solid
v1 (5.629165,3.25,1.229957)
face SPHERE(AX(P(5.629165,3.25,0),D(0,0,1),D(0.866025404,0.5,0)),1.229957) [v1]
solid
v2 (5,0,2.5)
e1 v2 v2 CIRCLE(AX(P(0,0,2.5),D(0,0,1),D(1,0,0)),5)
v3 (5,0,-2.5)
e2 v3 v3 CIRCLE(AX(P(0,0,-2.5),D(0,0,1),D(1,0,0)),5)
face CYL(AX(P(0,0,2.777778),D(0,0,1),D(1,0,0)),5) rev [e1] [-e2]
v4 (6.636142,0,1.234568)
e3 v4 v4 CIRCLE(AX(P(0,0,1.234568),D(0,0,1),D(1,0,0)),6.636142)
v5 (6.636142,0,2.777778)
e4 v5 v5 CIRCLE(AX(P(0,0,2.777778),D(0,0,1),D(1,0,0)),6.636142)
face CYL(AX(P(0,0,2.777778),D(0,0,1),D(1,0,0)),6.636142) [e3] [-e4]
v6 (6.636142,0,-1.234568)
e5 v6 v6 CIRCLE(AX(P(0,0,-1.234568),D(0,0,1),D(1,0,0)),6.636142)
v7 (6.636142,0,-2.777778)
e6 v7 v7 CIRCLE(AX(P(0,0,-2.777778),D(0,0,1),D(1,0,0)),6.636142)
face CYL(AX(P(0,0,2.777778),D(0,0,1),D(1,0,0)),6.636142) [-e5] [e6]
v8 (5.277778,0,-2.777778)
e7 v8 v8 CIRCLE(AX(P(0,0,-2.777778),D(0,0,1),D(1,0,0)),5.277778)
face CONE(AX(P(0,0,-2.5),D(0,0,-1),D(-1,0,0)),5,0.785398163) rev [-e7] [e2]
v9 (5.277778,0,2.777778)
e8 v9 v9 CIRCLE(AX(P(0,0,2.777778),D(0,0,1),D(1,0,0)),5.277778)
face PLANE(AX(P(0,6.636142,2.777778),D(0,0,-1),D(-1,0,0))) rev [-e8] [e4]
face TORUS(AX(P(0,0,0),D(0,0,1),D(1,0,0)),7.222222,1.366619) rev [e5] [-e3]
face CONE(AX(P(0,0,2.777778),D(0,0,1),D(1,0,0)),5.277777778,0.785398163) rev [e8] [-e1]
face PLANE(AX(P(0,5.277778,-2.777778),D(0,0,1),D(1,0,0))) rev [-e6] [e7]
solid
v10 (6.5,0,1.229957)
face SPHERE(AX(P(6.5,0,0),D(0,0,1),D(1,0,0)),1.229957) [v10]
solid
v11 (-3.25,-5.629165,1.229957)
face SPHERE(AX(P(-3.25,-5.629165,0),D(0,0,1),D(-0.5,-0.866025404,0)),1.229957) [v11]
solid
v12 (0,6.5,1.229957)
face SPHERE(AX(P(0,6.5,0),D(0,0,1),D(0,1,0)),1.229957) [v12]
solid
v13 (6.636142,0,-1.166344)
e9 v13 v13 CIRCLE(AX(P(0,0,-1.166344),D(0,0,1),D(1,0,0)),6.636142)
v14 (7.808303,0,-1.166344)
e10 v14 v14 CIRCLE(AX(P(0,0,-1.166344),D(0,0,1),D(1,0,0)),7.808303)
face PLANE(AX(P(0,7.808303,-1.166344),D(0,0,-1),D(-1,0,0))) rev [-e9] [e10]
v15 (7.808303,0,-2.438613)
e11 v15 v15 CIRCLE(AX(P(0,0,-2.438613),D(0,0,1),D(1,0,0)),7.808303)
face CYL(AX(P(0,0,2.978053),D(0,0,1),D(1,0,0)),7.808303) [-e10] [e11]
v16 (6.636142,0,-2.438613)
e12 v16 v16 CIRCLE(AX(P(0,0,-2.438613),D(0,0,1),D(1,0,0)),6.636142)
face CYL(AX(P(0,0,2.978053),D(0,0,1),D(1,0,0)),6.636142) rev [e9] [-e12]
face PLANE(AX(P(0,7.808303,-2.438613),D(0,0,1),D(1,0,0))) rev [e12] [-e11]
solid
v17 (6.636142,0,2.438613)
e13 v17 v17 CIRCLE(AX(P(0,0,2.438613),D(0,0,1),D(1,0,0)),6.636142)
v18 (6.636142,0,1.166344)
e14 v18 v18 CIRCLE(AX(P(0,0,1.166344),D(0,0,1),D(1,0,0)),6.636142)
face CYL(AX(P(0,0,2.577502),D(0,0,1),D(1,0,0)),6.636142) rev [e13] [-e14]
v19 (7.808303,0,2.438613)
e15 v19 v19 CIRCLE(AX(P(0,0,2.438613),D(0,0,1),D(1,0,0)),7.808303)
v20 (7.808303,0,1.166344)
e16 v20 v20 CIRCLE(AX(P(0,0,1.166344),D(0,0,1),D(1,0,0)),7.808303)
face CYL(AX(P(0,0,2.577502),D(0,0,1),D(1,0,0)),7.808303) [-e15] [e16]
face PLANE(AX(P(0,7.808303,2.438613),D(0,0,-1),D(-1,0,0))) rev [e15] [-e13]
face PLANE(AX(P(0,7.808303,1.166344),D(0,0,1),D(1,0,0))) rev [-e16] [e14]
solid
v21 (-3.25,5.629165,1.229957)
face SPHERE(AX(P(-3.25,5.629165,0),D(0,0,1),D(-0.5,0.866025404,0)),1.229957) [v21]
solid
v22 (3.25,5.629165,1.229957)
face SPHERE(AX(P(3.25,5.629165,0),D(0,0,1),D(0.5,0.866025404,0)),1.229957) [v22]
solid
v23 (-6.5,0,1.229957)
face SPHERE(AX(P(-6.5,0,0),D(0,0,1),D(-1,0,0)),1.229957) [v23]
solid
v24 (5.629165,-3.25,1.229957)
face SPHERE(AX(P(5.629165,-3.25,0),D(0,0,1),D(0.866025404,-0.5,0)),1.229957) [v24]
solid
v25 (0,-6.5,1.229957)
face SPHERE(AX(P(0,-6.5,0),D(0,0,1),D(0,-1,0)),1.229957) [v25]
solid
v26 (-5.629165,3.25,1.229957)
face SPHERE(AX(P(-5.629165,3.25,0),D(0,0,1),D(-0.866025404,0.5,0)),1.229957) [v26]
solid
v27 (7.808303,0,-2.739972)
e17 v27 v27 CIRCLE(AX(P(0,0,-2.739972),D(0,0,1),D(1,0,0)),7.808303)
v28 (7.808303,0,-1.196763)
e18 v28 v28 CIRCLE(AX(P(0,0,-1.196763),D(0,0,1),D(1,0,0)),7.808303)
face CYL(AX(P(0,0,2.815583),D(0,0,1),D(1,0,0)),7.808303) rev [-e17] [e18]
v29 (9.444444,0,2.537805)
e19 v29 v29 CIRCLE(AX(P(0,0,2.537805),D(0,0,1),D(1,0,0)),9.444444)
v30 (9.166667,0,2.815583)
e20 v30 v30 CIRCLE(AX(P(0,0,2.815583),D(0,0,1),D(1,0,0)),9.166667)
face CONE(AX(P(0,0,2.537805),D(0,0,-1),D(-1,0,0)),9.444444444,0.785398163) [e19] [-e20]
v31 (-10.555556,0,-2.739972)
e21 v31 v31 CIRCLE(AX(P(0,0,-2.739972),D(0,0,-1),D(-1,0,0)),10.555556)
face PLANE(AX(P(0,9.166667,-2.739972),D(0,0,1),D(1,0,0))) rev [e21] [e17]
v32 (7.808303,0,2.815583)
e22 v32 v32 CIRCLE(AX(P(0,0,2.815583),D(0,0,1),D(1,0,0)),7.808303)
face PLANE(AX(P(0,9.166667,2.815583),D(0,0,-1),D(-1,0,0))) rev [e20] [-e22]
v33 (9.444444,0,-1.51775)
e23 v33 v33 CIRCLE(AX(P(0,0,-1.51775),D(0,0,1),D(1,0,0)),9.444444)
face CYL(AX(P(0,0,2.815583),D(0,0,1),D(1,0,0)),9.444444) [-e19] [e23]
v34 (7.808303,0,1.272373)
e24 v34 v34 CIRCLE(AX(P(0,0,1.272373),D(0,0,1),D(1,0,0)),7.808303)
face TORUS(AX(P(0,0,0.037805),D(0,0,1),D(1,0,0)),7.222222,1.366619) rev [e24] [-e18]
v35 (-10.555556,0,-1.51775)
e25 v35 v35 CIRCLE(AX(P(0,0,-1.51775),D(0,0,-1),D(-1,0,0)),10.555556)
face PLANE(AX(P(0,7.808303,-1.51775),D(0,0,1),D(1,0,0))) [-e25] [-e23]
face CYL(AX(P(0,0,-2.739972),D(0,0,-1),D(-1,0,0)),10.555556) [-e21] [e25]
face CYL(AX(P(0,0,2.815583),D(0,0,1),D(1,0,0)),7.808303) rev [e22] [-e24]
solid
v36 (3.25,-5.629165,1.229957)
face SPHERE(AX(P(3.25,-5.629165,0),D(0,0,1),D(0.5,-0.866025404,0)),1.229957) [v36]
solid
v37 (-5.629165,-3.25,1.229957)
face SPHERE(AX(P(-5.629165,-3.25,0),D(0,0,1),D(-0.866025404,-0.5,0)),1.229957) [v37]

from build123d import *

# Parameters (mm, degrees)
CIRPATTERN1_COUNT    = 12
SKETCH5_W            = 1.145042615
SKETCH5_H            = 1.054945054
SKETCH6_W            = 1.1
SKETCH6_H            = 2.472527473
SCALE1_OUTLINE_W     = 0.055555556
SCALE1_OUTLINE_H     = 0.117750197
SCALE1_START         = 1.229957385
SCALE1_5_OUTLINE_R   = 6.636141636
SCALE1_5_OUTLINE_R_2 = 5.972527473
SCALE1_5_DEPTH       = 1.145042615
SCALE1_START_2       = 1.166343906
SCALE1_6_OUTLINE_R   = 7.808302808
SCALE1_6_OUTLINE_R_2 = 6.636141636
SCALE1_6_DEPTH       = 1.272269573
SCALE1_START_3       = -2.375
SCALE1_7_OUTLINE_R   = 6.636141636
SCALE1_7_OUTLINE_R_2 = 5.972527473
SCALE1_7_DEPTH       = 1.145042615
SCALE1_START_4       = -2.438613479
SCALE1_8_OUTLINE_R   = 7.808302808
SCALE1_8_OUTLINE_R_2 = 6.636141636
SCALE1_8_DEPTH       = 1.272269573


with BuildPart() as part:
    # Sketch1 → Revolve1 (revolve)
    with BuildSketch(Plane(origin=(0, 0, 0), x_dir=(0, 0, -1), z_dir=(1, 0, 0)), mode=Mode.PRIVATE) as revolve1_sk:
        with BuildLine():
            Line((2.25, 8.5), (-2.25, 8.5))
            Line((-2.25, 8.5), (-2.5, 8.25))
            Line((-2.5, 8.25), (-2.5, 7.027472527))
            Line((-2.5, 7.027472527), (-1.111111111, 7.027472527))
            ThreePointArc((-1.111111111, 7.027472527), (0, 7.729957385), (1.111111111, 7.027472527))
            Line((1.111111111, 7.027472527), (2.5, 7.027472527))
            Line((2.5, 7.027472527), (2.5, 8.25))
            Line((2.5, 8.25), (2.25, 8.5))
        make_face()
    revolve(revolve1_sk.sketch.rotate(Axis((0, 0, 2.5), (0, 0, -1)), 90), axis=Axis((0, 0, 2.5), (0, 0, -1)))

    # Sketch6 → Revolve6 (revolve)
    with BuildSketch(Plane(origin=(0, 0, 0), x_dir=(0, 0, -1), z_dir=(1, 0, 0)), mode=Mode.PRIVATE) as revolve6_sk:
        with Locations((1.95, 8.263736264)):
            Rectangle(SKETCH6_W, SKETCH6_H)
    revolve(revolve6_sk.sketch.rotate(Axis((0, 0, -2.5), (0, 0, 1)), 270), axis=Axis((0, 0, -2.5), (0, 0, 1)))

    # Scale1: read off the stored shape, not the designer's step
    # Scale1 outline → Scale1 (revolve, cut)
    with BuildSketch(Plane.XZ):
        with Locations((9.472222222, -1.458875099)):
            Rectangle(SCALE1_OUTLINE_W, SCALE1_OUTLINE_H)
        with BuildLine():
            Line((7.808302808, 1.27237326), (7.808302808, 2.5))
            Line((7.808302808, 2.5), (7.027472527, 2.5))
            Line((7.027472527, 2.5), (7.027472527, 1.111111111))
            ThreePointArc((7.027472527, 1.111111111), (7.729957385, 0), (7.027472527, -1.111111111))
            Line((7.027472527, -1.111111111), (7.027472527, -2.5))
            Line((7.027472527, -2.5), (7.808302808, -2.5))
            Line((7.808302808, -2.5), (7.808302808, -1.196762542))
            ThreePointArc((7.808302808, -1.196762542), (8.226746068, -0.888790669), (8.5, -0.446892802))
            Line((8.5, -0.446892802), (8.5, 0.52250352))
            ThreePointArc((8.5, 0.52250352), (8.226746068, 0.964401387), (7.808302808, 1.27237326))
        make_face()
    revolve(axis=Axis((0, 0, 0), (0, 0, 1)), mode=Mode.SUBTRACT)

    # Scale1 2 outline → Scale1 2 (revolve)
    with BuildSketch(Plane.XZ):
        with BuildLine():
            Line((9.444444444, 2.537805359), (9.166666667, 2.815583137))
            Line((9.166666667, 2.815583137), (7.808302808, 2.815583137))
            Line((7.808302808, 2.815583137), (7.808302808, 2.5))
            Line((7.808302808, 2.5), (8.25, 2.5))
            Line((8.25, 2.5), (8.5, 2.25))
            Line((8.5, 2.25), (8.5, 0.52250352))
            ThreePointArc((8.5, 0.52250352), (8.588841539, 0.037805359), (8.5, -0.446892802))
            Line((8.5, -0.446892802), (8.5, -1.4))
            Line((8.5, -1.4), (9.444444444, -1.4))
            Line((9.444444444, -1.4), (9.444444444, 2.537805359))
        make_face()
        Polygon((10.555555556, -1.517750197), (9.5, -1.517750197), (9.5, -2.5), (7.808302808, -2.5), (7.808302808, -2.739972419), (10.555555556, -2.739972419), align=None)
    revolve(axis=Axis((0, 0, 0), (0, 0, 1)))


with BuildPart() as body_2:
    # Sketch3 → Revolve3 (revolve)
    with BuildSketch(Plane(origin=(0, 0, 0), x_dir=(0, 0, -1), z_dir=(1, 0, 0)), mode=Mode.PRIVATE) as revolve3_sk:
        with BuildLine():
            Line((-2.5, 5.972527473), (-1.111111111, 5.972527473))
            ThreePointArc((-1.111111111, 5.972527473), (0, 5.270042615), (1.111111111, 5.972527473))
            Line((1.111111111, 5.972527473), (2.5, 5.972527473))
            Line((2.5, 5.972527473), (2.5, 4.75))
            Line((2.5, 4.75), (2.25, 4.5))
            Line((2.25, 4.5), (-2.25, 4.5))
            Line((-2.25, 4.5), (-2.5, 4.75))
            Line((-2.5, 4.75), (-2.5, 5.972527473))
        make_face()
    revolve(revolve3_sk.sketch.rotate(Axis((0, 0, 2.5), (0, 0, -1)), 90), axis=Axis((0, 0, 2.5), (0, 0, -1)))

    # Scale1 3 outline → Scale1 3 (revolve, cut)
    with BuildSketch(Plane.XZ):
        Polygon((5, -2.5), (5, 2.5), (4.75, 2.5), (4.5, 2.25), (4.5, -2.25), (4.75, -2.5), align=None)
    revolve(axis=Axis((0, 0, 0), (0, 0, 1)), mode=Mode.SUBTRACT)

    # Scale1 4 outline → Scale1 4 (revolve)
    with BuildSketch(Plane.XZ):
        with BuildLine():
            Line((5.277777778, 2.777777778), (5, 2.5))
            Line((5, 2.5), (5.972527473, 2.5))
            Line((5.972527473, 2.5), (5.972527473, 1.111111111))
            ThreePointArc((5.972527473, 1.111111111), (5.270042615, 0), (5.972527473, -1.111111111))
            Line((5.972527473, -1.111111111), (5.972527473, -2.5))
            Line((5.972527473, -2.5), (5, -2.5))
            Line((5, -2.5), (5.277777778, -2.777777778))
            Line((5.277777778, -2.777777778), (6.636141636, -2.777777778))
            Line((6.636141636, -2.777777778), (6.636141636, -1.234567901))
            ThreePointArc((6.636141636, -1.234567901), (5.855602906, 0), (6.636141636, 1.234567901))
            Line((6.636141636, 1.234567901), (6.636141636, 2.777777778))
            Line((6.636141636, 2.777777778), (5.277777778, 2.777777778))
        make_face()
    revolve(axis=Axis((0, 0, 0), (0, 0, 1)))


with BuildPart() as body_3:
    # Sketch4 → Revolve4 (revolve)
    with BuildSketch(Plane(origin=(0, 0, 0), x_dir=(0, 0, -1), z_dir=(1, 0, 0))):
        with BuildLine():
            Line((-1.229957385, 6.5), (1.229957385, 6.5))
            ThreePointArc((1.229957385, 6.5), (0, 7.729957385), (-1.229957385, 6.5))
        make_face()
    revolve(axis=Axis((0, 6.5, 1.229957385), (0, 0, -1)))


with BuildPart() as cirpattern1_1:
    # CirPattern1: pattern copy
    add(body_3.part.rotate(Axis((0, 0, 0), (0, 0, 1)), 1 * 360 / CIRPATTERN1_COUNT))


with BuildPart() as cirpattern1_2:
    # CirPattern1: pattern copy
    add(body_3.part.rotate(Axis((0, 0, 0), (0, 0, 1)), 2 * 360 / CIRPATTERN1_COUNT))


with BuildPart() as cirpattern1_3:
    # CirPattern1: pattern copy
    add(body_3.part.rotate(Axis((0, 0, 0), (0, 0, 1)), 3 * 360 / CIRPATTERN1_COUNT))


with BuildPart() as cirpattern1_4:
    # CirPattern1: pattern copy
    add(body_3.part.rotate(Axis((0, 0, 0), (0, 0, 1)), 4 * 360 / CIRPATTERN1_COUNT))


with BuildPart() as cirpattern1_5:
    # CirPattern1: pattern copy
    add(body_3.part.rotate(Axis((0, 0, 0), (0, 0, 1)), 5 * 360 / CIRPATTERN1_COUNT))


with BuildPart() as cirpattern1_6:
    # CirPattern1: pattern copy
    add(body_3.part.rotate(Axis((0, 0, 0), (0, 0, 1)), 6 * 360 / CIRPATTERN1_COUNT))


with BuildPart() as cirpattern1_7:
    # CirPattern1: pattern copy
    add(body_3.part.rotate(Axis((0, 0, 0), (0, 0, 1)), 7 * 360 / CIRPATTERN1_COUNT))


with BuildPart() as cirpattern1_8:
    # CirPattern1: pattern copy
    add(body_3.part.rotate(Axis((0, 0, 0), (0, 0, 1)), 8 * 360 / CIRPATTERN1_COUNT))


with BuildPart() as cirpattern1_9:
    # CirPattern1: pattern copy
    add(body_3.part.rotate(Axis((0, 0, 0), (0, 0, 1)), 9 * 360 / CIRPATTERN1_COUNT))


with BuildPart() as cirpattern1_10:
    # CirPattern1: pattern copy
    add(body_3.part.rotate(Axis((0, 0, 0), (0, 0, 1)), 10 * 360 / CIRPATTERN1_COUNT))


with BuildPart() as cirpattern1_11:
    # CirPattern1: pattern copy
    add(body_3.part.rotate(Axis((0, 0, 0), (0, 0, 1)), 11 * 360 / CIRPATTERN1_COUNT))


with BuildPart() as body_15:
    # Sketch5 → Revolve5 (revolve)
    with BuildSketch(Plane(origin=(0, 0, 0), x_dir=(0, 0, -1), z_dir=(1, 0, 0)), mode=Mode.PRIVATE) as revolve5_sk:
        with Locations((-1.802478693, 6.5)):
            Rectangle(SKETCH5_W, SKETCH5_H)
        with Locations((1.802478693, 6.5)):
            Rectangle(SKETCH5_W, SKETCH5_H)
    revolve(revolve5_sk.sketch.rotate(Axis((0, 0, 2.5), (0, 0, -1)), 90), axis=Axis((0, 0, 2.5), (0, 0, -1)))

    # Scale1 5 outline → Scale1 5 (cut)
    with BuildSketch(Plane.XY.offset(SCALE1_START)):
        Circle(SCALE1_5_OUTLINE_R)
        Circle(SCALE1_5_OUTLINE_R_2, mode=Mode.SUBTRACT)
    extrude(amount=SCALE1_5_DEPTH, mode=Mode.SUBTRACT)

    # Scale1 6 outline → Scale1 6 (add)
    with BuildSketch(Plane.XY.offset(SCALE1_START_2)):
        Circle(SCALE1_6_OUTLINE_R)
        Circle(SCALE1_6_OUTLINE_R_2, mode=Mode.SUBTRACT)
    extrude(amount=SCALE1_6_DEPTH)

    # Scale1 7 outline → Scale1 7 (cut)
    with BuildSketch(Plane.XY.offset(SCALE1_START_3)):
        Circle(SCALE1_7_OUTLINE_R)
        Circle(SCALE1_7_OUTLINE_R_2, mode=Mode.SUBTRACT)
    extrude(amount=SCALE1_7_DEPTH, mode=Mode.SUBTRACT)

    # Scale1 8 outline → Scale1 8 (add)
    with BuildSketch(Plane.XY.offset(SCALE1_START_4)):
        Circle(SCALE1_8_OUTLINE_R)
        Circle(SCALE1_8_OUTLINE_R_2, mode=Mode.SUBTRACT)
    extrude(amount=SCALE1_8_DEPTH)


solid = Compound([part.part, body_2.part, body_3.part, cirpattern1_1.part, cirpattern1_2.part, cirpattern1_3.part, cirpattern1_4.part, cirpattern1_5.part, cirpattern1_6.part, cirpattern1_7.part, cirpattern1_8.part, cirpattern1_9.part, cirpattern1_10.part, cirpattern1_11.part, body_15.part])
